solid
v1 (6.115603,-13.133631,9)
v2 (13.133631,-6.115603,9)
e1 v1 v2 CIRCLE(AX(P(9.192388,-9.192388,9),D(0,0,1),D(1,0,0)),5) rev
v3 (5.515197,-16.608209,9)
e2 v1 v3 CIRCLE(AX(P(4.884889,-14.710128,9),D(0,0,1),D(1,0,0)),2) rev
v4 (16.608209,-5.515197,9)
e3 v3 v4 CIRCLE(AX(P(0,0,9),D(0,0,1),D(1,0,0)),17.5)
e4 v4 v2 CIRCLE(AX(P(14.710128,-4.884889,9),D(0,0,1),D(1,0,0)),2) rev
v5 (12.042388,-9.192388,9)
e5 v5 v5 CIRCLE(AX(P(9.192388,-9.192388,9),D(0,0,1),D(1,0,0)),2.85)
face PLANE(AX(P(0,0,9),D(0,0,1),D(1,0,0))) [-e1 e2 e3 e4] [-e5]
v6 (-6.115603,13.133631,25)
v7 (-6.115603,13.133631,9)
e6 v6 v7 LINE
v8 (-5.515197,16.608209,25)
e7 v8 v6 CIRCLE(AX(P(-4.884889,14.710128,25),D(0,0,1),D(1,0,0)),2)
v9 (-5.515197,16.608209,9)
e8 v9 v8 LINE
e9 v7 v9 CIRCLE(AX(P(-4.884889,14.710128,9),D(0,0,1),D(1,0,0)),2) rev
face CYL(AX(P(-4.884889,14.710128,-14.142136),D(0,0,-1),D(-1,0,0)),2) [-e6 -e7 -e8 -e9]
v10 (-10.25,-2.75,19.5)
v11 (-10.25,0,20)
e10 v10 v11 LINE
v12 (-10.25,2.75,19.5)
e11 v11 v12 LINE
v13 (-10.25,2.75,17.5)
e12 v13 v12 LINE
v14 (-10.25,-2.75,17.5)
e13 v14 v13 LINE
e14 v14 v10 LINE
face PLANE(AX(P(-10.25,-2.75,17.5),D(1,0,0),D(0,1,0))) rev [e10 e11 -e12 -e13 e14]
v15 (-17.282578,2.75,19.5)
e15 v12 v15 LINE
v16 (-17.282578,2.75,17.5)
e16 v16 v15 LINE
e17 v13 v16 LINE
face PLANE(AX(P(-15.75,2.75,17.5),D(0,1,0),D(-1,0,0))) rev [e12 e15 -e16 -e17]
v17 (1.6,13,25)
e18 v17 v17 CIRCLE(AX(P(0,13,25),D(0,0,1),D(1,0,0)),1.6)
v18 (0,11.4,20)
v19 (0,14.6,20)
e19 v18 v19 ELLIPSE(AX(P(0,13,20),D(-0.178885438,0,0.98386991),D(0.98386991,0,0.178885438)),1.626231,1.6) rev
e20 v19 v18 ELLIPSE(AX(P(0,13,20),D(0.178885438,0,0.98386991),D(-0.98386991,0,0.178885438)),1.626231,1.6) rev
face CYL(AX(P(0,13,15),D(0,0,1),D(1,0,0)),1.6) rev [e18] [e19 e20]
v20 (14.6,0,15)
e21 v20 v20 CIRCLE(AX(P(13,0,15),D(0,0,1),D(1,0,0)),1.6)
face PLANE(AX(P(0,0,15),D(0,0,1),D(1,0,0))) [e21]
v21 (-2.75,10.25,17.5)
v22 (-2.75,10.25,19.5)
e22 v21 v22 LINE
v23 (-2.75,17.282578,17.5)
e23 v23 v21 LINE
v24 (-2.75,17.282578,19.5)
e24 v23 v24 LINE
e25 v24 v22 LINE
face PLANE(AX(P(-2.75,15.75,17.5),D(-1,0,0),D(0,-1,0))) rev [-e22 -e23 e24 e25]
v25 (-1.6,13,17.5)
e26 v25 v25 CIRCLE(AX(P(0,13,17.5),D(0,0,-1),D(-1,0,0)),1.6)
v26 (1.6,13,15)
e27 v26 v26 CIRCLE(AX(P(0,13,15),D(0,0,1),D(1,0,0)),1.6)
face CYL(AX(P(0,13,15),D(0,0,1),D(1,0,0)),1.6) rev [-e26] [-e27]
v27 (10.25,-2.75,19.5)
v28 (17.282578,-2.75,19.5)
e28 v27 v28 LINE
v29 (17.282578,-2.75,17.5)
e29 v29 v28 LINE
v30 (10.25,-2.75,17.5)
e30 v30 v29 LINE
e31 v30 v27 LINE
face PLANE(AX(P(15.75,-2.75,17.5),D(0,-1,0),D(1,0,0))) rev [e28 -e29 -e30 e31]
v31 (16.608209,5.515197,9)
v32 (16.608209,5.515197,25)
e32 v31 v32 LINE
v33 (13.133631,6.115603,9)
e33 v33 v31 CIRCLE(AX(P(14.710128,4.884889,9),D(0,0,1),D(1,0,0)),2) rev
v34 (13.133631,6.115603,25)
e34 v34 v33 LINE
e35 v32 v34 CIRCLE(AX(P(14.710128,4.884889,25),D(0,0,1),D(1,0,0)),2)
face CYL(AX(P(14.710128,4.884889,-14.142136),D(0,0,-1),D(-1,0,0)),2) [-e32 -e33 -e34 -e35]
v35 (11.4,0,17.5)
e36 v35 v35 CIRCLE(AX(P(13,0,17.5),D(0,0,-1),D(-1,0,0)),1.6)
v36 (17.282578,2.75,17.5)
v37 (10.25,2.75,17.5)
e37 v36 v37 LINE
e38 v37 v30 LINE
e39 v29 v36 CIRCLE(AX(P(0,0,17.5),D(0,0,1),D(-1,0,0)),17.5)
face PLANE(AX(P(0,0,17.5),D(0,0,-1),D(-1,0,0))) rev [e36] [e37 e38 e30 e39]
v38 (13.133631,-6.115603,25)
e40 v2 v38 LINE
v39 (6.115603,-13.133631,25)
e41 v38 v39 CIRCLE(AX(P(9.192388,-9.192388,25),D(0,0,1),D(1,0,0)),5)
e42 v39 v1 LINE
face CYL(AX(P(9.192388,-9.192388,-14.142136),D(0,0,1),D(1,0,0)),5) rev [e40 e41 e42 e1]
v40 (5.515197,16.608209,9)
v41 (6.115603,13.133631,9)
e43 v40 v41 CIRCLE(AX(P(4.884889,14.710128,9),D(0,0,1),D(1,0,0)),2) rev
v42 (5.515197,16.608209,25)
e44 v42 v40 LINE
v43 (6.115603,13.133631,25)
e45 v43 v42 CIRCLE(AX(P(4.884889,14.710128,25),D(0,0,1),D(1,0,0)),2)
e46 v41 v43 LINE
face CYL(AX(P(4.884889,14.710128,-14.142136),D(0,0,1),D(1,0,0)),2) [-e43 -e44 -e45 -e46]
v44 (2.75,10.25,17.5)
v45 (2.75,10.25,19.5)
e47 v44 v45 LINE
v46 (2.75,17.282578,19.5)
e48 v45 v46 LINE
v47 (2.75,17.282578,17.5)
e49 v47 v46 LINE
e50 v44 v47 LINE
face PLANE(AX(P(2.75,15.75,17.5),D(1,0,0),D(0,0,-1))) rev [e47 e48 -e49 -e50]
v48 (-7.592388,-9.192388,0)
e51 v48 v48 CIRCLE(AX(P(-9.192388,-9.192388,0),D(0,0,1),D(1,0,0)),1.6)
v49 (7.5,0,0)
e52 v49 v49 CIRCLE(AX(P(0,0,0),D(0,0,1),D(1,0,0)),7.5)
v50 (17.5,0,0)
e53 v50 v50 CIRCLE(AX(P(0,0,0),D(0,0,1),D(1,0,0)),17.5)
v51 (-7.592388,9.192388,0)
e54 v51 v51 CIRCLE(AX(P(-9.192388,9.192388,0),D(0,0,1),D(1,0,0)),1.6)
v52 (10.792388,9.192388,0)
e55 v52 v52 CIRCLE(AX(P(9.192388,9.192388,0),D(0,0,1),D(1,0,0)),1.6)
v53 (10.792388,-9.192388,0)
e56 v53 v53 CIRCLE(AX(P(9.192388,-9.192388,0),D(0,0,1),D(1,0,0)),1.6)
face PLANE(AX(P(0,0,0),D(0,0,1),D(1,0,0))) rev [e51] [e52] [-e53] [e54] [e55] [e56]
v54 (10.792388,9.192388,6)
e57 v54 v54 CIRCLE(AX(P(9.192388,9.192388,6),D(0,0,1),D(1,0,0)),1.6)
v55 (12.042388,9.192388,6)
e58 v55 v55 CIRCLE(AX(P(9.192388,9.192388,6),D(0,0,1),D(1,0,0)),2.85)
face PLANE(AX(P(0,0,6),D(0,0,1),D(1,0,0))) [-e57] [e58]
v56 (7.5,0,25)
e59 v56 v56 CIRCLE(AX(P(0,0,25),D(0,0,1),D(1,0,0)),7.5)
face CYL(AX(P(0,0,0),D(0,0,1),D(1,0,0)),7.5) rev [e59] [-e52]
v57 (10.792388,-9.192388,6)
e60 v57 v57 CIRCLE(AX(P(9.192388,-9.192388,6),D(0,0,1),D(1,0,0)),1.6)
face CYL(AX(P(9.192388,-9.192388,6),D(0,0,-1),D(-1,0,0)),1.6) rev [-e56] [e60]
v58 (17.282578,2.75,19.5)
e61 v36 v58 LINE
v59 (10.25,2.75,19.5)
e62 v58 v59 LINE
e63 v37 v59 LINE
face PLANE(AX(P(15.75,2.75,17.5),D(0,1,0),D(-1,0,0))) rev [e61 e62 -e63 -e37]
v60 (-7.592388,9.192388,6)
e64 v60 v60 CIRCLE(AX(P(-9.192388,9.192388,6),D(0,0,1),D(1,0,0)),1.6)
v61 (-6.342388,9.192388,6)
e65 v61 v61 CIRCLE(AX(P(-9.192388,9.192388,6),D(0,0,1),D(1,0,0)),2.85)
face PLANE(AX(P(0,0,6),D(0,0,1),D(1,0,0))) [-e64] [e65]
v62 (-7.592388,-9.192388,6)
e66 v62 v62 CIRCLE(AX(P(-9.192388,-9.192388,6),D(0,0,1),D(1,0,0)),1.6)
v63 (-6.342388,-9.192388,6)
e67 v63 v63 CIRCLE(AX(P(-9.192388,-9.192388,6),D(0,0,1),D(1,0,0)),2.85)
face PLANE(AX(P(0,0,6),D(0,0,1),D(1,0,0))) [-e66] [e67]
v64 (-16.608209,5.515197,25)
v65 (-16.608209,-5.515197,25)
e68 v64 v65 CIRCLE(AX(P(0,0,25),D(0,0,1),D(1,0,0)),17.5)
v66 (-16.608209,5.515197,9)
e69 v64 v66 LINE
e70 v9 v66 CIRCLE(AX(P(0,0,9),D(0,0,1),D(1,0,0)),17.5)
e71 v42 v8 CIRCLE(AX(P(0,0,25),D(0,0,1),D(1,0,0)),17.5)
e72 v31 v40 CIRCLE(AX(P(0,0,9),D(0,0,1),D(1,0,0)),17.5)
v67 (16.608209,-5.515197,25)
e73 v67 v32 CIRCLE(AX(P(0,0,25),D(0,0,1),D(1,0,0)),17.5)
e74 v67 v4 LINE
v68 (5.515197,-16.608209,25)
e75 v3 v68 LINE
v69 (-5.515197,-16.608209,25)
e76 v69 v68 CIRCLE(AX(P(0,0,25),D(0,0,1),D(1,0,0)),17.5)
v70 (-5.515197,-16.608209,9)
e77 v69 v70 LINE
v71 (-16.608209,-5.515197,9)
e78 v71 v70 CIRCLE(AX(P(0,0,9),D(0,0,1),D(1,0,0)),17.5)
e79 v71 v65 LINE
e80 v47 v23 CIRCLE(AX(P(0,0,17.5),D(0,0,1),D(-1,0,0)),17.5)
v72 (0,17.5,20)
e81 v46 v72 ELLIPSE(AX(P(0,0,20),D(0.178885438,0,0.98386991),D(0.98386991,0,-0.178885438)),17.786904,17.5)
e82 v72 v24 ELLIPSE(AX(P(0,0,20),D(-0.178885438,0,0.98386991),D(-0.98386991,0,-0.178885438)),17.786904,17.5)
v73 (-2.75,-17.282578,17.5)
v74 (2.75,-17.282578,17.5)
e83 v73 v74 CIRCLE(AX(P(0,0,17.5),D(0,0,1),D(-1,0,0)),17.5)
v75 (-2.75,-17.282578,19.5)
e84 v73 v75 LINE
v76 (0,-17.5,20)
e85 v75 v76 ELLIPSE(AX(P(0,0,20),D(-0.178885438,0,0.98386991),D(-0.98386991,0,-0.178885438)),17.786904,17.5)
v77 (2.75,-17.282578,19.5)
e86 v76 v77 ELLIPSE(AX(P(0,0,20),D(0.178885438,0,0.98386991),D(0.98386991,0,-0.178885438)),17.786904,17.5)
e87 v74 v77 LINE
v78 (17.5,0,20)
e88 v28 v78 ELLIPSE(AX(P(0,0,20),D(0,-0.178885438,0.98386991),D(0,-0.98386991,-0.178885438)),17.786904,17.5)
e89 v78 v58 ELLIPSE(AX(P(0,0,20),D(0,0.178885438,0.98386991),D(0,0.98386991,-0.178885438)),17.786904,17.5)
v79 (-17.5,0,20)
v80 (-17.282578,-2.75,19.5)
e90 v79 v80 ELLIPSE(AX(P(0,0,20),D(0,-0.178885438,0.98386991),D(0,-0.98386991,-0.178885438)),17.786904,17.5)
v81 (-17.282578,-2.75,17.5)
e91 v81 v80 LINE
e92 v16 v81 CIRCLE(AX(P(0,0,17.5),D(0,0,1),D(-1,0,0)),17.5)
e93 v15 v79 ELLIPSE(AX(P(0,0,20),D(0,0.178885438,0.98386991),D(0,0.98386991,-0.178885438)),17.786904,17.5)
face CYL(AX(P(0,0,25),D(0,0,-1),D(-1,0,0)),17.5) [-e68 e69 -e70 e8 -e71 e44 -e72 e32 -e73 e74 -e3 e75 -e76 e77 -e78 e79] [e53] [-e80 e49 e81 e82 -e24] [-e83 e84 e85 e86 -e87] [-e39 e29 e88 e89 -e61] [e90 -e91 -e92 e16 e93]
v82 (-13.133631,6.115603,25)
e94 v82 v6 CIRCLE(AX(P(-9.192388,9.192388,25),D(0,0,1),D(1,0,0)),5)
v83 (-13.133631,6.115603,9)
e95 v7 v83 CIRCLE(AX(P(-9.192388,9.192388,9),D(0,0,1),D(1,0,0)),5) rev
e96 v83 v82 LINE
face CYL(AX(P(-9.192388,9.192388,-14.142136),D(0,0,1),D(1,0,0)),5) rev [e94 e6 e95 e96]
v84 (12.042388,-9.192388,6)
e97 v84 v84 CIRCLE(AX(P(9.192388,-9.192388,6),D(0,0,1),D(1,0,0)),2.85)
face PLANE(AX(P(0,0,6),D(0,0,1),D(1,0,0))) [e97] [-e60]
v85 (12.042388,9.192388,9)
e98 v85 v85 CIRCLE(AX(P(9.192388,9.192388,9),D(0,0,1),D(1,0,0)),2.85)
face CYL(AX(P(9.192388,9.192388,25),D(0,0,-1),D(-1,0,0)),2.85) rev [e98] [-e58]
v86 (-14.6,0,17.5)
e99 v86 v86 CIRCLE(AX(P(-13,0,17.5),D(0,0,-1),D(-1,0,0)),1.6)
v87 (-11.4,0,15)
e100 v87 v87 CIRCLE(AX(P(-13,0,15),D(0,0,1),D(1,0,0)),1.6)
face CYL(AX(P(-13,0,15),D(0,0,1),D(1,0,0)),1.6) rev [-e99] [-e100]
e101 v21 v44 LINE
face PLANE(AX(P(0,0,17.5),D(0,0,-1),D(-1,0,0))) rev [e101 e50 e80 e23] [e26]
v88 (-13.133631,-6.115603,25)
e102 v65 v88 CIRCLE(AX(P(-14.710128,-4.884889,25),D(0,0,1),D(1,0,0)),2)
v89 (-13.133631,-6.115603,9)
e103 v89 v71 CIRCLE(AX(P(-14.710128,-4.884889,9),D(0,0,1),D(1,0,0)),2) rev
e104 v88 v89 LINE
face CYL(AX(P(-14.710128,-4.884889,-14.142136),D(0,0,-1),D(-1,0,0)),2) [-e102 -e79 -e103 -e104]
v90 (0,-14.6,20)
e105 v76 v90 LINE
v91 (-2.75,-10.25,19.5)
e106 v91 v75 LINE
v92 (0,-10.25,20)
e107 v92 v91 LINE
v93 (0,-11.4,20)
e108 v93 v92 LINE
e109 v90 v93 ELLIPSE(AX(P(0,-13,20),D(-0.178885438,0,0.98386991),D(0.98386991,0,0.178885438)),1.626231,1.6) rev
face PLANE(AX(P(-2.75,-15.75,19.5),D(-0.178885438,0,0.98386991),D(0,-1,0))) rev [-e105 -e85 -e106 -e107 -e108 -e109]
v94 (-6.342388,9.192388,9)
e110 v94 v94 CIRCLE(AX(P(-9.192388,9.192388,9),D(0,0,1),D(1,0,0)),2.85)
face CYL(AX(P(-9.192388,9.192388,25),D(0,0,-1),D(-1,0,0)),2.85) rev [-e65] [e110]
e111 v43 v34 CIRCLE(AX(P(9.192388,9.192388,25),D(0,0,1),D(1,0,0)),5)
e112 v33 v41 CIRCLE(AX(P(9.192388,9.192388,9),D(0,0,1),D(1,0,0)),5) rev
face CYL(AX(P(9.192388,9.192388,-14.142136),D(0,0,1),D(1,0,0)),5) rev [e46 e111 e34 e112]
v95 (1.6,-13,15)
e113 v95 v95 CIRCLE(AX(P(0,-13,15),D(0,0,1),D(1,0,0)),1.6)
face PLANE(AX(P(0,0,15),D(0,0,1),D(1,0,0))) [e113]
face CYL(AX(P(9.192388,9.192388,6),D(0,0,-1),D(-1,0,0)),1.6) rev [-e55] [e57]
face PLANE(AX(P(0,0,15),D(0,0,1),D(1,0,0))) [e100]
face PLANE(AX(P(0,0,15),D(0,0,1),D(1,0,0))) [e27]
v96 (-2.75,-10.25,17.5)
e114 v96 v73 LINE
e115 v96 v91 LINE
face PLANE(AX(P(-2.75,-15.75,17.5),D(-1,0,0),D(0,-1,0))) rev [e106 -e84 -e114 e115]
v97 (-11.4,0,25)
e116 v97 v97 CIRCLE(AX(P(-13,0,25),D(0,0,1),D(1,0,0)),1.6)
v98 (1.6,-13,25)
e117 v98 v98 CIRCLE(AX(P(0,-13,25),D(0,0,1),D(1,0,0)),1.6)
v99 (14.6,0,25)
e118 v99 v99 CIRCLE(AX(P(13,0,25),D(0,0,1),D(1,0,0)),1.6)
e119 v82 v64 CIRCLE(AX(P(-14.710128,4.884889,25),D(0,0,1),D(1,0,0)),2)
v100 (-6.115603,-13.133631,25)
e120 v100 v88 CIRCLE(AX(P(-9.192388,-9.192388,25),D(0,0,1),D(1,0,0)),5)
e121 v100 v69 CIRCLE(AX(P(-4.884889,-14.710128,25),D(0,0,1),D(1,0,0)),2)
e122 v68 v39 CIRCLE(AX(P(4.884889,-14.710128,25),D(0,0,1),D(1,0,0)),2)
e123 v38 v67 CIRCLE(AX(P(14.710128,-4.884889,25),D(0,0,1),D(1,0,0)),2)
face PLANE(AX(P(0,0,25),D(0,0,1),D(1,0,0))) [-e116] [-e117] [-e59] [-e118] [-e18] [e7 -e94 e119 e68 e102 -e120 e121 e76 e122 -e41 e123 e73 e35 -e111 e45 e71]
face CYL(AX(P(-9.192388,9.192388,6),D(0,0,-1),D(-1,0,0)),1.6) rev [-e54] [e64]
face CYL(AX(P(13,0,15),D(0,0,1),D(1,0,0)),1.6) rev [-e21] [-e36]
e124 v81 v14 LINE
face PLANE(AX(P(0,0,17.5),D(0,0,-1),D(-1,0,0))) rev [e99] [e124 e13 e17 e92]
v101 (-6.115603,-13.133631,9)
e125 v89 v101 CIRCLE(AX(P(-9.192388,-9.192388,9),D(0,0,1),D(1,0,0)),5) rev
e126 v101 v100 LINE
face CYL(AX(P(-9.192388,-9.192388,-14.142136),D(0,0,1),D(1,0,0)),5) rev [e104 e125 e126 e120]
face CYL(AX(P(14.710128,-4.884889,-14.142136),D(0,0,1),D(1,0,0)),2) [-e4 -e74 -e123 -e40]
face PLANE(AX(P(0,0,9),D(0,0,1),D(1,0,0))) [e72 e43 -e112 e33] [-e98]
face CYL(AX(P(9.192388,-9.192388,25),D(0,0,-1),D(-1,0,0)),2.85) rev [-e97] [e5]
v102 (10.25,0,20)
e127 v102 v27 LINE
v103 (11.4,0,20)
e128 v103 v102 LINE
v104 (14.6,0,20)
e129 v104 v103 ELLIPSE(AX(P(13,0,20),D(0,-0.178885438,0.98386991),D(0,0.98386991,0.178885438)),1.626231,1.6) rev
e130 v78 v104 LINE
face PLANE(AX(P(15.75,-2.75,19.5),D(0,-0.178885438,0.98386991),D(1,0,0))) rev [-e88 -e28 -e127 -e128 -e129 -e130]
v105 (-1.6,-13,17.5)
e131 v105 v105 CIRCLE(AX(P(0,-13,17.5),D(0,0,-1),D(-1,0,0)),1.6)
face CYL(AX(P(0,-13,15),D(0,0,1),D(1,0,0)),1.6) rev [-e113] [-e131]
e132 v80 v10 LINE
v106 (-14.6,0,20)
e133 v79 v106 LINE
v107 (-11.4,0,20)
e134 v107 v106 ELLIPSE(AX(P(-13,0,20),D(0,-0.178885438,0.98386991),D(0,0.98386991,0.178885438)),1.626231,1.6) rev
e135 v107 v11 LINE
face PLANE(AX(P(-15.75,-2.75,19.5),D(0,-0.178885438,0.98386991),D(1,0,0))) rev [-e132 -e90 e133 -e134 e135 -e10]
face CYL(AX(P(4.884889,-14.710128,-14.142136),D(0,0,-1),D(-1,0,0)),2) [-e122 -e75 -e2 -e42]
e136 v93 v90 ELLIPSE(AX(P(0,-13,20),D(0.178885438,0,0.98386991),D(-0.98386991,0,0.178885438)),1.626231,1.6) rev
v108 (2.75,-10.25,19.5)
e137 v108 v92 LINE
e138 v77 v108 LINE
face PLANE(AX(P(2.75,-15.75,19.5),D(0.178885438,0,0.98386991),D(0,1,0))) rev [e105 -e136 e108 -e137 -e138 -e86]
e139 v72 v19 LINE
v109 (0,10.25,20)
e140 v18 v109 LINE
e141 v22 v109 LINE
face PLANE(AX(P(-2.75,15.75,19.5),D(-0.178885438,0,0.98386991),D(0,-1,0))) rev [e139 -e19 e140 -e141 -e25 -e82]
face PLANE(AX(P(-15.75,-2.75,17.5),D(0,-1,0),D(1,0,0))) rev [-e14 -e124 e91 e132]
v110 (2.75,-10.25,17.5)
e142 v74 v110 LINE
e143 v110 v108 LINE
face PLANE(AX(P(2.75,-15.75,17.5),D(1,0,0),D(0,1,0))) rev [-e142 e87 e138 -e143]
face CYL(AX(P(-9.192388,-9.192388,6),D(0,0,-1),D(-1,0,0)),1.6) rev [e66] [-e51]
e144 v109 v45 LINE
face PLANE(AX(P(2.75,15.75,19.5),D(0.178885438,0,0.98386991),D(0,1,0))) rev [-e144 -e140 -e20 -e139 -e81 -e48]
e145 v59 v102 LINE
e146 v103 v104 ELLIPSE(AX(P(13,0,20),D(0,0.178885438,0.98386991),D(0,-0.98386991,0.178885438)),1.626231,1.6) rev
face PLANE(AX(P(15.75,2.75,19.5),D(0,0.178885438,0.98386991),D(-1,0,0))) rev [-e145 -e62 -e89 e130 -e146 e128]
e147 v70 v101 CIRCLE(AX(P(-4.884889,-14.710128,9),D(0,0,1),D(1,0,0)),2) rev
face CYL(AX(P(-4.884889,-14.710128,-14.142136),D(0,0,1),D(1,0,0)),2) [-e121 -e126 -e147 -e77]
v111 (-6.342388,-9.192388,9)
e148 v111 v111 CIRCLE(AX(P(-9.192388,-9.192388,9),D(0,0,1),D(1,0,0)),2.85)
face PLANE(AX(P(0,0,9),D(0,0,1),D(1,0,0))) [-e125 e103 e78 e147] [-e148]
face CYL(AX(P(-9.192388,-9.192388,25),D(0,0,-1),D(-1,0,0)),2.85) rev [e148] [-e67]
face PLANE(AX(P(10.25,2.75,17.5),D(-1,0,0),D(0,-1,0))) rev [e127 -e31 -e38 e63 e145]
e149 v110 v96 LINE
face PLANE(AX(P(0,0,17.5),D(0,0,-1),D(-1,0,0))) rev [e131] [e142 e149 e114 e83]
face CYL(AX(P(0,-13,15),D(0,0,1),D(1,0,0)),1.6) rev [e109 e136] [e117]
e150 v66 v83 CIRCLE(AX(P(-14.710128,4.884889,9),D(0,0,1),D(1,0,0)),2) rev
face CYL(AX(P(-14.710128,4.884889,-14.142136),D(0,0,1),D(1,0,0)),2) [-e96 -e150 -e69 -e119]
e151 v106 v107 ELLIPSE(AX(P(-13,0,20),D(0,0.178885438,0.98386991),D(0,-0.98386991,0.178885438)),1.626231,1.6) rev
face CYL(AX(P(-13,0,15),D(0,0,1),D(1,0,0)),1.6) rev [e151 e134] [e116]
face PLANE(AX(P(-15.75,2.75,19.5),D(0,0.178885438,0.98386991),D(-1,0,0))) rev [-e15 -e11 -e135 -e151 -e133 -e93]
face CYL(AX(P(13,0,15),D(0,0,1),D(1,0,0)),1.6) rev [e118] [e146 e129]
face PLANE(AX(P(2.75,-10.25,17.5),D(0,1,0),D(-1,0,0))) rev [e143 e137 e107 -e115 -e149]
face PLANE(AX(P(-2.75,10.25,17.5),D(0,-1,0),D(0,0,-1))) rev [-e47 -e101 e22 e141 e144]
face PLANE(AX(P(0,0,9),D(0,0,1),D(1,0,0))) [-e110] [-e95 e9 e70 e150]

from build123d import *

# Parameters (mm, degrees)
SKETCH1_R           = 17.5
SKETCH1_R_2         = 2.85
BOSS_EXTRUDE1_DEPTH = 25
SKETCH1_3_R         = 2.85
SKETCH1_3_R_2       = 1.6
BOSS_EXTRUDE2_DEPTH = 6
SKETCH2_R           = 5
CUT_EXTRUDE1_DEPTH  = 16
FILLET1_R           = 2
CUT_EXTRUDE2_START  = -7.5
SKETCH3_R           = 1.6
CUT_EXTRUDE2_DEPTH  = 2.5
CUT_EXTRUDE3_START  = -10
SKETCH3_2_R         = 1.6
CUT_EXTRUDE3_DEPTH  = 10
CHAMFER1_SIZE       = 2.75
CHAMFER1_SIZE_2     = 0.5
SKETCH4_R           = 7.5
CUT_EXTRUDE4_DEPTH  = 36.178118369


with BuildPart() as part:
    # Sketch1 → Boss-Extrude1 (new body)
    with BuildSketch(Plane(origin=(0, 0, 0), x_dir=(0, 1, 0), z_dir=(0, 0, 1))):
        with Locations(Location((0, 0, 0), (0, 0, 270))):
            Circle(SKETCH1_R)
        with Locations(Location((-9.192388155, 9.192388155, 0), (0, 0, 270))):
            Circle(SKETCH1_R_2, mode=Mode.SUBTRACT)
        with Locations(Location((-9.192388155, -9.192388155, 0), (0, 0, 270))):
            Circle(SKETCH1_R_2, mode=Mode.SUBTRACT)
        with Locations(Location((9.192388155, -9.192388155, 0), (0, 0, 270))):
            Circle(SKETCH1_R_2, mode=Mode.SUBTRACT)
        with Locations(Location((9.192388155, 9.192388155, 0), (0, 0, 270))):
            Circle(SKETCH1_R_2, mode=Mode.SUBTRACT)
    extrude(amount=BOSS_EXTRUDE1_DEPTH)

    # Sketch1<3> → Boss-Extrude2 (add)
    # profile 1 of 4: a face of its own
    with BuildSketch(Plane(origin=(0, 0, 0), x_dir=(0, 1, 0), z_dir=(0, 0, 1))):
        with Locations(Location((-9.192388155, -9.192388155, 0), (0, 0, 270))):
            Circle(SKETCH1_3_R)
        with Locations(Location((-9.192388155, -9.192388155, 0), (0, 0, 270))):
            Circle(SKETCH1_3_R_2, mode=Mode.SUBTRACT)
    # profile 2 of 4: a face of its own
    with BuildSketch(Plane(origin=(0, 0, 0), x_dir=(0, 1, 0), z_dir=(0, 0, 1))):
        with Locations(Location((-9.192388155, 9.192388155, 0), (0, 0, 270))):
            Circle(SKETCH1_3_R)
        with Locations(Location((-9.192388155, 9.192388155, 0), (0, 0, 270))):
            Circle(SKETCH1_3_R_2, mode=Mode.SUBTRACT)
    # profile 3 of 4: a face of its own
    with BuildSketch(Plane(origin=(0, 0, 0), x_dir=(0, 1, 0), z_dir=(0, 0, 1))):
        with Locations(Location((9.192388155, -9.192388155, 0), (0, 0, 270))):
            Circle(SKETCH1_3_R)
        with Locations(Location((9.192388155, -9.192388155, 0), (0, 0, 270))):
            Circle(SKETCH1_3_R_2, mode=Mode.SUBTRACT)
    # profile 4 of 4: a face of its own
    with BuildSketch(Plane(origin=(0, 0, 0), x_dir=(0, 1, 0), z_dir=(0, 0, 1))):
        with Locations(Location((9.192388155, 9.192388155, 0), (0, 0, 270))):
            Circle(SKETCH1_3_R)
        with Locations(Location((9.192388155, 9.192388155, 0), (0, 0, 270))):
            Circle(SKETCH1_3_R_2, mode=Mode.SUBTRACT)
    extrude(amount=BOSS_EXTRUDE2_DEPTH)

    # Sketch2 → Cut-Extrude1 (cut)
    with BuildSketch(Plane.XY.offset(25)):
        with Locations((-9.192388155, 9.192388155)):
            Circle(SKETCH2_R)
        with Locations((9.192388155, 9.192388155)):
            Circle(SKETCH2_R)
        with Locations((9.192388155, -9.192388155)):
            Circle(SKETCH2_R)
        with Locations((-9.192388155, -9.192388155)):
            Circle(SKETCH2_R)
    extrude(amount=-CUT_EXTRUDE1_DEPTH, mode=Mode.SUBTRACT)

    # Fillet1
    fillet1_edges = [part.edges().sort_by_distance(p)[0] for p in [
        (-14.028560913, -10.46181049, 17),
        (-10.46181049, -14.028560913, 17),
        (10.46181049, -14.028560913, 17),
        (14.028560913, -10.46181049, 17),
        (14.028560913, 10.46181049, 17),
        (10.46181049, 14.028560913, 17),
        (-10.46181049, 14.028560913, 17),
        (-14.028560913, 10.46181049, 17),
    ]]
    fillet(fillet1_edges, radius=FILLET1_R)

    # Sketch3 → Cut-Extrude2 (cut)
    # profile 1 of 4: a face of its own
    with BuildSketch(Plane.XY.offset(25).offset(CUT_EXTRUDE2_START)):
        with BuildLine():
            Line((-2.75, 15.75), (-2.75, 17.282577933))
            ThreePointArc((-2.75, 17.282577933), (0, 17.5), (2.75, 17.282577933))
            Line((2.75, 17.282577933), (2.75, 15.75))
            Line((2.75, 15.75), (2.75, 10.25))
            Line((2.75, 10.25), (-2.75, 10.25))
            Line((-2.75, 10.25), (-2.75, 15.75))
        make_face()
        with Locations((0, 13)):
            Circle(SKETCH3_R, mode=Mode.SUBTRACT)
    # profile 2 of 4: a face of its own
    with BuildSketch(Plane.XY.offset(25).offset(CUT_EXTRUDE2_START)):
        with BuildLine():
            Line((15.75, -2.75), (10.25, -2.75))
            Line((10.25, -2.75), (10.25, 2.75))
            Line((10.25, 2.75), (15.75, 2.75))
            Line((15.75, 2.75), (17.282577933, 2.75))
            ThreePointArc((17.282577933, 2.75), (17.5, 0), (17.282577933, -2.75))
            Line((17.282577933, -2.75), (15.75, -2.75))
        make_face()
        with Locations((13, 0)):
            Circle(SKETCH3_R, mode=Mode.SUBTRACT)
    # profile 3 of 4: a face of its own
    with BuildSketch(Plane.XY.offset(25).offset(CUT_EXTRUDE2_START)):
        with BuildLine():
            Line((-2.75, -15.75), (-2.75, -10.25))
            Line((-2.75, -10.25), (2.75, -10.25))
            Line((2.75, -10.25), (2.75, -15.75))
            Line((2.75, -15.75), (2.75, -17.282577933))
            ThreePointArc((2.75, -17.282577933), (0, -17.5), (-2.75, -17.282577933))
            Line((-2.75, -17.282577933), (-2.75, -15.75))
        make_face()
        with Locations((0, -13)):
            Circle(SKETCH3_R, mode=Mode.SUBTRACT)
    # profile 4 of 4: a face of its own
    with BuildSketch(Plane.XY.offset(25).offset(CUT_EXTRUDE2_START)):
        with BuildLine():
            Line((-15.75, 2.75), (-10.25, 2.75))
            Line((-10.25, 2.75), (-10.25, -2.75))
            Line((-10.25, -2.75), (-15.75, -2.75))
            Line((-15.75, -2.75), (-17.282577933, -2.75))
            ThreePointArc((-17.282577933, -2.75), (-17.5, 0), (-17.282577933, 2.75))
            Line((-17.282577933, 2.75), (-15.75, 2.75))
        make_face()
        with Locations((-13, 0)):
            Circle(SKETCH3_R, mode=Mode.SUBTRACT)
    extrude(amount=CUT_EXTRUDE2_DEPTH, mode=Mode.SUBTRACT)

    # Sketch3<2> → Cut-Extrude3 (cut)
    with BuildSketch(Plane.XY.offset(25).offset(CUT_EXTRUDE3_START)):
        with Locations((-13, 0)):
            Circle(SKETCH3_2_R)
        with Locations((0, 13)):
            Circle(SKETCH3_2_R)
        with Locations((13, 0)):
            Circle(SKETCH3_2_R)
        with Locations((0, -13)):
            Circle(SKETCH3_2_R)
    extrude(amount=CUT_EXTRUDE3_DEPTH, mode=Mode.SUBTRACT)

    # Chamfer1
    # the kernel refuses this chamfer: 2.75, 0.5 mm, written as the material it adds along each edge
    with BuildSketch(Plane(origin=(-3.104266441, -2.75, 20), x_dir=(1.0355932807417332e-14, 0.9999763028084744, 0.006884317068104265), z_dir=(-1, 0, 0))) as chamfer1_piece_1_section:
        Polygon((CHAMFER1_SIZE * 0.999976302808, CHAMFER1_SIZE * 0.0068843170681), (-CHAMFER1_SIZE_2 * 0.0068843170681, CHAMFER1_SIZE_2 * 0.999976302808), (0, 0), align=None)
    chamfer1_piece_1 = extrude(amount=21.324045051, mode=Mode.PRIVATE)
    chamfer1_piece_1 = chamfer1_piece_1 & Plane(origin=(0, 0, 19.863927103), x_dir=(1, 0, 0), z_dir=(0, 0, -1)) * Cylinder(17.5, 54, mode=Mode.PRIVATE)
    chamfer1_piece_1 = chamfer1_piece_1 - Plane(origin=(-13, 0, 19.863927103), x_dir=(1, 0, 0), z_dir=(0, 0, -1)) * Cylinder(1.6, 54, mode=Mode.PRIVATE)
    add(chamfer1_piece_1)
    with BuildSketch(Plane(origin=(-24.428311492, 2.75, 20), x_dir=(2.1371797081769355e-15, 0.20388124945923355, -0.9789956262001082), z_dir=(1, 0, 0))) as chamfer1_piece_2_section:
        Polygon((CHAMFER1_SIZE_2 * 0.9789956262, -CHAMFER1_SIZE_2 * 0.203881249459), (-CHAMFER1_SIZE * 0.203881249459, -CHAMFER1_SIZE * 0.9789956262), (0, 0), align=None)
    chamfer1_piece_2 = extrude(amount=21.324045051, mode=Mode.PRIVATE)
    chamfer1_piece_2 = chamfer1_piece_2 & Plane(origin=(0, 0, 19.852070676), x_dir=(1, 0, 0), z_dir=(0, 0, -1)) * Cylinder(17.5, 54, mode=Mode.PRIVATE)
    chamfer1_piece_2 = chamfer1_piece_2 - Plane(origin=(-13, 0, 19.852070676), x_dir=(1, 0, 0), z_dir=(0, 0, -1)) * Cylinder(1.6, 54, mode=Mode.PRIVATE)
    add(chamfer1_piece_2)
    with BuildSketch(Plane(origin=(-2.75, 3.104266441, 20), x_dir=(0.9999763028084744, 0, 0.006884317068104265), z_dir=(0, 1, 0))) as chamfer1_piece_3_section:
        Polygon((CHAMFER1_SIZE * 0.999976302808, CHAMFER1_SIZE * 0.0068843170681), (-CHAMFER1_SIZE_2 * 0.0068843170681, CHAMFER1_SIZE_2 * 0.999976302808), (0, 0), align=None)
    chamfer1_piece_3 = extrude(amount=21.324045051, mode=Mode.PRIVATE)
    chamfer1_piece_3 = chamfer1_piece_3 & Plane(origin=(0, 0, 19.863927103), x_dir=(1, 0, 0), z_dir=(0, 0, -1)) * Cylinder(17.5, 54, mode=Mode.PRIVATE)
    chamfer1_piece_3 = chamfer1_piece_3 - Plane(origin=(0, 13, 19.863927103), x_dir=(1, 0, 0), z_dir=(0, 0, -1)) * Cylinder(1.6, 54, mode=Mode.PRIVATE)
    add(chamfer1_piece_3)
    with BuildSketch(Plane(origin=(2.75, 24.428311492, 20), x_dir=(0.20388124945923355, 0, -0.9789956262001082), z_dir=(0, -1, 0))) as chamfer1_piece_4_section:
        Polygon((CHAMFER1_SIZE_2 * 0.9789956262, -CHAMFER1_SIZE_2 * 0.203881249459), (-CHAMFER1_SIZE * 0.203881249459, -CHAMFER1_SIZE * 0.9789956262), (0, 0), align=None)
    chamfer1_piece_4 = extrude(amount=21.324045051, mode=Mode.PRIVATE)
    chamfer1_piece_4 = chamfer1_piece_4 & Plane(origin=(0, 0, 19.852070749), x_dir=(1, 0, 0), z_dir=(0, 0, -1)) * Cylinder(17.5, 54, mode=Mode.PRIVATE)
    chamfer1_piece_4 = chamfer1_piece_4 - Plane(origin=(0, 13, 19.852070749), x_dir=(1, 0, 0), z_dir=(0, 0, -1)) * Cylinder(1.6, 54, mode=Mode.PRIVATE)
    add(chamfer1_piece_4)
    with BuildSketch(Plane(origin=(3.104266441, 2.75, 20), x_dir=(-3.409880314637416e-15, -0.9999763028084744, 0.006884317068104265), z_dir=(1, 0, 0))) as chamfer1_piece_5_section:
        Polygon((CHAMFER1_SIZE * 0.999976302808, CHAMFER1_SIZE * 0.0068843170681), (-CHAMFER1_SIZE_2 * 0.0068843170681, CHAMFER1_SIZE_2 * 0.999976302808), (0, 0), align=None)
    chamfer1_piece_5 = extrude(amount=21.324045051, mode=Mode.PRIVATE)
    chamfer1_piece_5 = chamfer1_piece_5 & Plane(origin=(0, 0, 19.863927103), x_dir=(1, 0, 0), z_dir=(0, 0, -1)) * Cylinder(17.5, 54, mode=Mode.PRIVATE)
    chamfer1_piece_5 = chamfer1_piece_5 - Plane(origin=(13, 0, 19.863927103), x_dir=(1, 0, 0), z_dir=(0, 0, -1)) * Cylinder(1.6, 54, mode=Mode.PRIVATE)
    add(chamfer1_piece_5)
    with BuildSketch(Plane(origin=(24.428311492, -2.75, 20), x_dir=(3.409880314637416e-15, 0.9999763028084744, 0.006884317068104265), z_dir=(-1, 0, 0))) as chamfer1_piece_6_section:
        Polygon((CHAMFER1_SIZE * 0.999976302808, CHAMFER1_SIZE * 0.0068843170681), (-CHAMFER1_SIZE_2 * 0.0068843170681, CHAMFER1_SIZE_2 * 0.999976302808), (0, 0), align=None)
    chamfer1_piece_6 = extrude(amount=21.324045051, mode=Mode.PRIVATE)
    chamfer1_piece_6 = chamfer1_piece_6 & Plane(origin=(0, 0, 19.852070366), x_dir=(1, 0, 0), z_dir=(0, 0, -1)) * Cylinder(17.5, 54, mode=Mode.PRIVATE)
    chamfer1_piece_6 = chamfer1_piece_6 - Plane(origin=(13, 0, 19.852070366), x_dir=(1, 0, 0), z_dir=(0, 0, -1)) * Cylinder(1.6, 54, mode=Mode.PRIVATE)
    add(chamfer1_piece_6)
    with BuildSketch(Plane(origin=(2.75, -3.104266441, 20), x_dir=(-0.9999763028084744, 6.88290656102737e-15, 0.006884317068104265), z_dir=(0, -1, 0))) as chamfer1_piece_7_section:
        Polygon((CHAMFER1_SIZE * 0.999976302808, CHAMFER1_SIZE * 0.0068843170681), (-CHAMFER1_SIZE_2 * 0.0068843170681, CHAMFER1_SIZE_2 * 0.999976302808), (0, 0), align=None)
    chamfer1_piece_7 = extrude(amount=21.324045051, mode=Mode.PRIVATE)
    chamfer1_piece_7 = chamfer1_piece_7 & Plane(origin=(0, 0, 19.863927103), x_dir=(1, 0, 0), z_dir=(0, 0, -1)) * Cylinder(17.5, 54, mode=Mode.PRIVATE)
    chamfer1_piece_7 = chamfer1_piece_7 - Plane(origin=(0, -13, 19.863927103), x_dir=(1, 0, 0), z_dir=(0, 0, -1)) * Cylinder(1.6, 54, mode=Mode.PRIVATE)
    add(chamfer1_piece_7)
    with BuildSketch(Plane(origin=(-2.75, -24.428311492, 20), x_dir=(-0.20388124945923355, 1.4290779976363847e-15, -0.9789956262001082), z_dir=(0, 1, 0))) as chamfer1_piece_8_section:
        Polygon((CHAMFER1_SIZE_2 * 0.9789956262, -CHAMFER1_SIZE_2 * 0.203881249459), (-CHAMFER1_SIZE * 0.203881249459, -CHAMFER1_SIZE * 0.9789956262), (0, 0), align=None)
    chamfer1_piece_8 = extrude(amount=21.324045051, mode=Mode.PRIVATE)
    chamfer1_piece_8 = chamfer1_piece_8 & Plane(origin=(0, 0, 19.852070422), x_dir=(1, 0, 0), z_dir=(0, 0, -1)) * Cylinder(17.5, 54, mode=Mode.PRIVATE)
    chamfer1_piece_8 = chamfer1_piece_8 - Plane(origin=(0, -13, 19.852070422), x_dir=(1, 0, 0), z_dir=(0, 0, -1)) * Cylinder(1.6, 54, mode=Mode.PRIVATE)
    add(chamfer1_piece_8)

    # Sketch4 → Cut-Extrude4 (cut, through all)
    with BuildSketch(Plane.XY.offset(25)):
        Circle(SKETCH4_R)
    extrude(amount=-CUT_EXTRUDE4_DEPTH, mode=Mode.SUBTRACT)


solid = part.part
